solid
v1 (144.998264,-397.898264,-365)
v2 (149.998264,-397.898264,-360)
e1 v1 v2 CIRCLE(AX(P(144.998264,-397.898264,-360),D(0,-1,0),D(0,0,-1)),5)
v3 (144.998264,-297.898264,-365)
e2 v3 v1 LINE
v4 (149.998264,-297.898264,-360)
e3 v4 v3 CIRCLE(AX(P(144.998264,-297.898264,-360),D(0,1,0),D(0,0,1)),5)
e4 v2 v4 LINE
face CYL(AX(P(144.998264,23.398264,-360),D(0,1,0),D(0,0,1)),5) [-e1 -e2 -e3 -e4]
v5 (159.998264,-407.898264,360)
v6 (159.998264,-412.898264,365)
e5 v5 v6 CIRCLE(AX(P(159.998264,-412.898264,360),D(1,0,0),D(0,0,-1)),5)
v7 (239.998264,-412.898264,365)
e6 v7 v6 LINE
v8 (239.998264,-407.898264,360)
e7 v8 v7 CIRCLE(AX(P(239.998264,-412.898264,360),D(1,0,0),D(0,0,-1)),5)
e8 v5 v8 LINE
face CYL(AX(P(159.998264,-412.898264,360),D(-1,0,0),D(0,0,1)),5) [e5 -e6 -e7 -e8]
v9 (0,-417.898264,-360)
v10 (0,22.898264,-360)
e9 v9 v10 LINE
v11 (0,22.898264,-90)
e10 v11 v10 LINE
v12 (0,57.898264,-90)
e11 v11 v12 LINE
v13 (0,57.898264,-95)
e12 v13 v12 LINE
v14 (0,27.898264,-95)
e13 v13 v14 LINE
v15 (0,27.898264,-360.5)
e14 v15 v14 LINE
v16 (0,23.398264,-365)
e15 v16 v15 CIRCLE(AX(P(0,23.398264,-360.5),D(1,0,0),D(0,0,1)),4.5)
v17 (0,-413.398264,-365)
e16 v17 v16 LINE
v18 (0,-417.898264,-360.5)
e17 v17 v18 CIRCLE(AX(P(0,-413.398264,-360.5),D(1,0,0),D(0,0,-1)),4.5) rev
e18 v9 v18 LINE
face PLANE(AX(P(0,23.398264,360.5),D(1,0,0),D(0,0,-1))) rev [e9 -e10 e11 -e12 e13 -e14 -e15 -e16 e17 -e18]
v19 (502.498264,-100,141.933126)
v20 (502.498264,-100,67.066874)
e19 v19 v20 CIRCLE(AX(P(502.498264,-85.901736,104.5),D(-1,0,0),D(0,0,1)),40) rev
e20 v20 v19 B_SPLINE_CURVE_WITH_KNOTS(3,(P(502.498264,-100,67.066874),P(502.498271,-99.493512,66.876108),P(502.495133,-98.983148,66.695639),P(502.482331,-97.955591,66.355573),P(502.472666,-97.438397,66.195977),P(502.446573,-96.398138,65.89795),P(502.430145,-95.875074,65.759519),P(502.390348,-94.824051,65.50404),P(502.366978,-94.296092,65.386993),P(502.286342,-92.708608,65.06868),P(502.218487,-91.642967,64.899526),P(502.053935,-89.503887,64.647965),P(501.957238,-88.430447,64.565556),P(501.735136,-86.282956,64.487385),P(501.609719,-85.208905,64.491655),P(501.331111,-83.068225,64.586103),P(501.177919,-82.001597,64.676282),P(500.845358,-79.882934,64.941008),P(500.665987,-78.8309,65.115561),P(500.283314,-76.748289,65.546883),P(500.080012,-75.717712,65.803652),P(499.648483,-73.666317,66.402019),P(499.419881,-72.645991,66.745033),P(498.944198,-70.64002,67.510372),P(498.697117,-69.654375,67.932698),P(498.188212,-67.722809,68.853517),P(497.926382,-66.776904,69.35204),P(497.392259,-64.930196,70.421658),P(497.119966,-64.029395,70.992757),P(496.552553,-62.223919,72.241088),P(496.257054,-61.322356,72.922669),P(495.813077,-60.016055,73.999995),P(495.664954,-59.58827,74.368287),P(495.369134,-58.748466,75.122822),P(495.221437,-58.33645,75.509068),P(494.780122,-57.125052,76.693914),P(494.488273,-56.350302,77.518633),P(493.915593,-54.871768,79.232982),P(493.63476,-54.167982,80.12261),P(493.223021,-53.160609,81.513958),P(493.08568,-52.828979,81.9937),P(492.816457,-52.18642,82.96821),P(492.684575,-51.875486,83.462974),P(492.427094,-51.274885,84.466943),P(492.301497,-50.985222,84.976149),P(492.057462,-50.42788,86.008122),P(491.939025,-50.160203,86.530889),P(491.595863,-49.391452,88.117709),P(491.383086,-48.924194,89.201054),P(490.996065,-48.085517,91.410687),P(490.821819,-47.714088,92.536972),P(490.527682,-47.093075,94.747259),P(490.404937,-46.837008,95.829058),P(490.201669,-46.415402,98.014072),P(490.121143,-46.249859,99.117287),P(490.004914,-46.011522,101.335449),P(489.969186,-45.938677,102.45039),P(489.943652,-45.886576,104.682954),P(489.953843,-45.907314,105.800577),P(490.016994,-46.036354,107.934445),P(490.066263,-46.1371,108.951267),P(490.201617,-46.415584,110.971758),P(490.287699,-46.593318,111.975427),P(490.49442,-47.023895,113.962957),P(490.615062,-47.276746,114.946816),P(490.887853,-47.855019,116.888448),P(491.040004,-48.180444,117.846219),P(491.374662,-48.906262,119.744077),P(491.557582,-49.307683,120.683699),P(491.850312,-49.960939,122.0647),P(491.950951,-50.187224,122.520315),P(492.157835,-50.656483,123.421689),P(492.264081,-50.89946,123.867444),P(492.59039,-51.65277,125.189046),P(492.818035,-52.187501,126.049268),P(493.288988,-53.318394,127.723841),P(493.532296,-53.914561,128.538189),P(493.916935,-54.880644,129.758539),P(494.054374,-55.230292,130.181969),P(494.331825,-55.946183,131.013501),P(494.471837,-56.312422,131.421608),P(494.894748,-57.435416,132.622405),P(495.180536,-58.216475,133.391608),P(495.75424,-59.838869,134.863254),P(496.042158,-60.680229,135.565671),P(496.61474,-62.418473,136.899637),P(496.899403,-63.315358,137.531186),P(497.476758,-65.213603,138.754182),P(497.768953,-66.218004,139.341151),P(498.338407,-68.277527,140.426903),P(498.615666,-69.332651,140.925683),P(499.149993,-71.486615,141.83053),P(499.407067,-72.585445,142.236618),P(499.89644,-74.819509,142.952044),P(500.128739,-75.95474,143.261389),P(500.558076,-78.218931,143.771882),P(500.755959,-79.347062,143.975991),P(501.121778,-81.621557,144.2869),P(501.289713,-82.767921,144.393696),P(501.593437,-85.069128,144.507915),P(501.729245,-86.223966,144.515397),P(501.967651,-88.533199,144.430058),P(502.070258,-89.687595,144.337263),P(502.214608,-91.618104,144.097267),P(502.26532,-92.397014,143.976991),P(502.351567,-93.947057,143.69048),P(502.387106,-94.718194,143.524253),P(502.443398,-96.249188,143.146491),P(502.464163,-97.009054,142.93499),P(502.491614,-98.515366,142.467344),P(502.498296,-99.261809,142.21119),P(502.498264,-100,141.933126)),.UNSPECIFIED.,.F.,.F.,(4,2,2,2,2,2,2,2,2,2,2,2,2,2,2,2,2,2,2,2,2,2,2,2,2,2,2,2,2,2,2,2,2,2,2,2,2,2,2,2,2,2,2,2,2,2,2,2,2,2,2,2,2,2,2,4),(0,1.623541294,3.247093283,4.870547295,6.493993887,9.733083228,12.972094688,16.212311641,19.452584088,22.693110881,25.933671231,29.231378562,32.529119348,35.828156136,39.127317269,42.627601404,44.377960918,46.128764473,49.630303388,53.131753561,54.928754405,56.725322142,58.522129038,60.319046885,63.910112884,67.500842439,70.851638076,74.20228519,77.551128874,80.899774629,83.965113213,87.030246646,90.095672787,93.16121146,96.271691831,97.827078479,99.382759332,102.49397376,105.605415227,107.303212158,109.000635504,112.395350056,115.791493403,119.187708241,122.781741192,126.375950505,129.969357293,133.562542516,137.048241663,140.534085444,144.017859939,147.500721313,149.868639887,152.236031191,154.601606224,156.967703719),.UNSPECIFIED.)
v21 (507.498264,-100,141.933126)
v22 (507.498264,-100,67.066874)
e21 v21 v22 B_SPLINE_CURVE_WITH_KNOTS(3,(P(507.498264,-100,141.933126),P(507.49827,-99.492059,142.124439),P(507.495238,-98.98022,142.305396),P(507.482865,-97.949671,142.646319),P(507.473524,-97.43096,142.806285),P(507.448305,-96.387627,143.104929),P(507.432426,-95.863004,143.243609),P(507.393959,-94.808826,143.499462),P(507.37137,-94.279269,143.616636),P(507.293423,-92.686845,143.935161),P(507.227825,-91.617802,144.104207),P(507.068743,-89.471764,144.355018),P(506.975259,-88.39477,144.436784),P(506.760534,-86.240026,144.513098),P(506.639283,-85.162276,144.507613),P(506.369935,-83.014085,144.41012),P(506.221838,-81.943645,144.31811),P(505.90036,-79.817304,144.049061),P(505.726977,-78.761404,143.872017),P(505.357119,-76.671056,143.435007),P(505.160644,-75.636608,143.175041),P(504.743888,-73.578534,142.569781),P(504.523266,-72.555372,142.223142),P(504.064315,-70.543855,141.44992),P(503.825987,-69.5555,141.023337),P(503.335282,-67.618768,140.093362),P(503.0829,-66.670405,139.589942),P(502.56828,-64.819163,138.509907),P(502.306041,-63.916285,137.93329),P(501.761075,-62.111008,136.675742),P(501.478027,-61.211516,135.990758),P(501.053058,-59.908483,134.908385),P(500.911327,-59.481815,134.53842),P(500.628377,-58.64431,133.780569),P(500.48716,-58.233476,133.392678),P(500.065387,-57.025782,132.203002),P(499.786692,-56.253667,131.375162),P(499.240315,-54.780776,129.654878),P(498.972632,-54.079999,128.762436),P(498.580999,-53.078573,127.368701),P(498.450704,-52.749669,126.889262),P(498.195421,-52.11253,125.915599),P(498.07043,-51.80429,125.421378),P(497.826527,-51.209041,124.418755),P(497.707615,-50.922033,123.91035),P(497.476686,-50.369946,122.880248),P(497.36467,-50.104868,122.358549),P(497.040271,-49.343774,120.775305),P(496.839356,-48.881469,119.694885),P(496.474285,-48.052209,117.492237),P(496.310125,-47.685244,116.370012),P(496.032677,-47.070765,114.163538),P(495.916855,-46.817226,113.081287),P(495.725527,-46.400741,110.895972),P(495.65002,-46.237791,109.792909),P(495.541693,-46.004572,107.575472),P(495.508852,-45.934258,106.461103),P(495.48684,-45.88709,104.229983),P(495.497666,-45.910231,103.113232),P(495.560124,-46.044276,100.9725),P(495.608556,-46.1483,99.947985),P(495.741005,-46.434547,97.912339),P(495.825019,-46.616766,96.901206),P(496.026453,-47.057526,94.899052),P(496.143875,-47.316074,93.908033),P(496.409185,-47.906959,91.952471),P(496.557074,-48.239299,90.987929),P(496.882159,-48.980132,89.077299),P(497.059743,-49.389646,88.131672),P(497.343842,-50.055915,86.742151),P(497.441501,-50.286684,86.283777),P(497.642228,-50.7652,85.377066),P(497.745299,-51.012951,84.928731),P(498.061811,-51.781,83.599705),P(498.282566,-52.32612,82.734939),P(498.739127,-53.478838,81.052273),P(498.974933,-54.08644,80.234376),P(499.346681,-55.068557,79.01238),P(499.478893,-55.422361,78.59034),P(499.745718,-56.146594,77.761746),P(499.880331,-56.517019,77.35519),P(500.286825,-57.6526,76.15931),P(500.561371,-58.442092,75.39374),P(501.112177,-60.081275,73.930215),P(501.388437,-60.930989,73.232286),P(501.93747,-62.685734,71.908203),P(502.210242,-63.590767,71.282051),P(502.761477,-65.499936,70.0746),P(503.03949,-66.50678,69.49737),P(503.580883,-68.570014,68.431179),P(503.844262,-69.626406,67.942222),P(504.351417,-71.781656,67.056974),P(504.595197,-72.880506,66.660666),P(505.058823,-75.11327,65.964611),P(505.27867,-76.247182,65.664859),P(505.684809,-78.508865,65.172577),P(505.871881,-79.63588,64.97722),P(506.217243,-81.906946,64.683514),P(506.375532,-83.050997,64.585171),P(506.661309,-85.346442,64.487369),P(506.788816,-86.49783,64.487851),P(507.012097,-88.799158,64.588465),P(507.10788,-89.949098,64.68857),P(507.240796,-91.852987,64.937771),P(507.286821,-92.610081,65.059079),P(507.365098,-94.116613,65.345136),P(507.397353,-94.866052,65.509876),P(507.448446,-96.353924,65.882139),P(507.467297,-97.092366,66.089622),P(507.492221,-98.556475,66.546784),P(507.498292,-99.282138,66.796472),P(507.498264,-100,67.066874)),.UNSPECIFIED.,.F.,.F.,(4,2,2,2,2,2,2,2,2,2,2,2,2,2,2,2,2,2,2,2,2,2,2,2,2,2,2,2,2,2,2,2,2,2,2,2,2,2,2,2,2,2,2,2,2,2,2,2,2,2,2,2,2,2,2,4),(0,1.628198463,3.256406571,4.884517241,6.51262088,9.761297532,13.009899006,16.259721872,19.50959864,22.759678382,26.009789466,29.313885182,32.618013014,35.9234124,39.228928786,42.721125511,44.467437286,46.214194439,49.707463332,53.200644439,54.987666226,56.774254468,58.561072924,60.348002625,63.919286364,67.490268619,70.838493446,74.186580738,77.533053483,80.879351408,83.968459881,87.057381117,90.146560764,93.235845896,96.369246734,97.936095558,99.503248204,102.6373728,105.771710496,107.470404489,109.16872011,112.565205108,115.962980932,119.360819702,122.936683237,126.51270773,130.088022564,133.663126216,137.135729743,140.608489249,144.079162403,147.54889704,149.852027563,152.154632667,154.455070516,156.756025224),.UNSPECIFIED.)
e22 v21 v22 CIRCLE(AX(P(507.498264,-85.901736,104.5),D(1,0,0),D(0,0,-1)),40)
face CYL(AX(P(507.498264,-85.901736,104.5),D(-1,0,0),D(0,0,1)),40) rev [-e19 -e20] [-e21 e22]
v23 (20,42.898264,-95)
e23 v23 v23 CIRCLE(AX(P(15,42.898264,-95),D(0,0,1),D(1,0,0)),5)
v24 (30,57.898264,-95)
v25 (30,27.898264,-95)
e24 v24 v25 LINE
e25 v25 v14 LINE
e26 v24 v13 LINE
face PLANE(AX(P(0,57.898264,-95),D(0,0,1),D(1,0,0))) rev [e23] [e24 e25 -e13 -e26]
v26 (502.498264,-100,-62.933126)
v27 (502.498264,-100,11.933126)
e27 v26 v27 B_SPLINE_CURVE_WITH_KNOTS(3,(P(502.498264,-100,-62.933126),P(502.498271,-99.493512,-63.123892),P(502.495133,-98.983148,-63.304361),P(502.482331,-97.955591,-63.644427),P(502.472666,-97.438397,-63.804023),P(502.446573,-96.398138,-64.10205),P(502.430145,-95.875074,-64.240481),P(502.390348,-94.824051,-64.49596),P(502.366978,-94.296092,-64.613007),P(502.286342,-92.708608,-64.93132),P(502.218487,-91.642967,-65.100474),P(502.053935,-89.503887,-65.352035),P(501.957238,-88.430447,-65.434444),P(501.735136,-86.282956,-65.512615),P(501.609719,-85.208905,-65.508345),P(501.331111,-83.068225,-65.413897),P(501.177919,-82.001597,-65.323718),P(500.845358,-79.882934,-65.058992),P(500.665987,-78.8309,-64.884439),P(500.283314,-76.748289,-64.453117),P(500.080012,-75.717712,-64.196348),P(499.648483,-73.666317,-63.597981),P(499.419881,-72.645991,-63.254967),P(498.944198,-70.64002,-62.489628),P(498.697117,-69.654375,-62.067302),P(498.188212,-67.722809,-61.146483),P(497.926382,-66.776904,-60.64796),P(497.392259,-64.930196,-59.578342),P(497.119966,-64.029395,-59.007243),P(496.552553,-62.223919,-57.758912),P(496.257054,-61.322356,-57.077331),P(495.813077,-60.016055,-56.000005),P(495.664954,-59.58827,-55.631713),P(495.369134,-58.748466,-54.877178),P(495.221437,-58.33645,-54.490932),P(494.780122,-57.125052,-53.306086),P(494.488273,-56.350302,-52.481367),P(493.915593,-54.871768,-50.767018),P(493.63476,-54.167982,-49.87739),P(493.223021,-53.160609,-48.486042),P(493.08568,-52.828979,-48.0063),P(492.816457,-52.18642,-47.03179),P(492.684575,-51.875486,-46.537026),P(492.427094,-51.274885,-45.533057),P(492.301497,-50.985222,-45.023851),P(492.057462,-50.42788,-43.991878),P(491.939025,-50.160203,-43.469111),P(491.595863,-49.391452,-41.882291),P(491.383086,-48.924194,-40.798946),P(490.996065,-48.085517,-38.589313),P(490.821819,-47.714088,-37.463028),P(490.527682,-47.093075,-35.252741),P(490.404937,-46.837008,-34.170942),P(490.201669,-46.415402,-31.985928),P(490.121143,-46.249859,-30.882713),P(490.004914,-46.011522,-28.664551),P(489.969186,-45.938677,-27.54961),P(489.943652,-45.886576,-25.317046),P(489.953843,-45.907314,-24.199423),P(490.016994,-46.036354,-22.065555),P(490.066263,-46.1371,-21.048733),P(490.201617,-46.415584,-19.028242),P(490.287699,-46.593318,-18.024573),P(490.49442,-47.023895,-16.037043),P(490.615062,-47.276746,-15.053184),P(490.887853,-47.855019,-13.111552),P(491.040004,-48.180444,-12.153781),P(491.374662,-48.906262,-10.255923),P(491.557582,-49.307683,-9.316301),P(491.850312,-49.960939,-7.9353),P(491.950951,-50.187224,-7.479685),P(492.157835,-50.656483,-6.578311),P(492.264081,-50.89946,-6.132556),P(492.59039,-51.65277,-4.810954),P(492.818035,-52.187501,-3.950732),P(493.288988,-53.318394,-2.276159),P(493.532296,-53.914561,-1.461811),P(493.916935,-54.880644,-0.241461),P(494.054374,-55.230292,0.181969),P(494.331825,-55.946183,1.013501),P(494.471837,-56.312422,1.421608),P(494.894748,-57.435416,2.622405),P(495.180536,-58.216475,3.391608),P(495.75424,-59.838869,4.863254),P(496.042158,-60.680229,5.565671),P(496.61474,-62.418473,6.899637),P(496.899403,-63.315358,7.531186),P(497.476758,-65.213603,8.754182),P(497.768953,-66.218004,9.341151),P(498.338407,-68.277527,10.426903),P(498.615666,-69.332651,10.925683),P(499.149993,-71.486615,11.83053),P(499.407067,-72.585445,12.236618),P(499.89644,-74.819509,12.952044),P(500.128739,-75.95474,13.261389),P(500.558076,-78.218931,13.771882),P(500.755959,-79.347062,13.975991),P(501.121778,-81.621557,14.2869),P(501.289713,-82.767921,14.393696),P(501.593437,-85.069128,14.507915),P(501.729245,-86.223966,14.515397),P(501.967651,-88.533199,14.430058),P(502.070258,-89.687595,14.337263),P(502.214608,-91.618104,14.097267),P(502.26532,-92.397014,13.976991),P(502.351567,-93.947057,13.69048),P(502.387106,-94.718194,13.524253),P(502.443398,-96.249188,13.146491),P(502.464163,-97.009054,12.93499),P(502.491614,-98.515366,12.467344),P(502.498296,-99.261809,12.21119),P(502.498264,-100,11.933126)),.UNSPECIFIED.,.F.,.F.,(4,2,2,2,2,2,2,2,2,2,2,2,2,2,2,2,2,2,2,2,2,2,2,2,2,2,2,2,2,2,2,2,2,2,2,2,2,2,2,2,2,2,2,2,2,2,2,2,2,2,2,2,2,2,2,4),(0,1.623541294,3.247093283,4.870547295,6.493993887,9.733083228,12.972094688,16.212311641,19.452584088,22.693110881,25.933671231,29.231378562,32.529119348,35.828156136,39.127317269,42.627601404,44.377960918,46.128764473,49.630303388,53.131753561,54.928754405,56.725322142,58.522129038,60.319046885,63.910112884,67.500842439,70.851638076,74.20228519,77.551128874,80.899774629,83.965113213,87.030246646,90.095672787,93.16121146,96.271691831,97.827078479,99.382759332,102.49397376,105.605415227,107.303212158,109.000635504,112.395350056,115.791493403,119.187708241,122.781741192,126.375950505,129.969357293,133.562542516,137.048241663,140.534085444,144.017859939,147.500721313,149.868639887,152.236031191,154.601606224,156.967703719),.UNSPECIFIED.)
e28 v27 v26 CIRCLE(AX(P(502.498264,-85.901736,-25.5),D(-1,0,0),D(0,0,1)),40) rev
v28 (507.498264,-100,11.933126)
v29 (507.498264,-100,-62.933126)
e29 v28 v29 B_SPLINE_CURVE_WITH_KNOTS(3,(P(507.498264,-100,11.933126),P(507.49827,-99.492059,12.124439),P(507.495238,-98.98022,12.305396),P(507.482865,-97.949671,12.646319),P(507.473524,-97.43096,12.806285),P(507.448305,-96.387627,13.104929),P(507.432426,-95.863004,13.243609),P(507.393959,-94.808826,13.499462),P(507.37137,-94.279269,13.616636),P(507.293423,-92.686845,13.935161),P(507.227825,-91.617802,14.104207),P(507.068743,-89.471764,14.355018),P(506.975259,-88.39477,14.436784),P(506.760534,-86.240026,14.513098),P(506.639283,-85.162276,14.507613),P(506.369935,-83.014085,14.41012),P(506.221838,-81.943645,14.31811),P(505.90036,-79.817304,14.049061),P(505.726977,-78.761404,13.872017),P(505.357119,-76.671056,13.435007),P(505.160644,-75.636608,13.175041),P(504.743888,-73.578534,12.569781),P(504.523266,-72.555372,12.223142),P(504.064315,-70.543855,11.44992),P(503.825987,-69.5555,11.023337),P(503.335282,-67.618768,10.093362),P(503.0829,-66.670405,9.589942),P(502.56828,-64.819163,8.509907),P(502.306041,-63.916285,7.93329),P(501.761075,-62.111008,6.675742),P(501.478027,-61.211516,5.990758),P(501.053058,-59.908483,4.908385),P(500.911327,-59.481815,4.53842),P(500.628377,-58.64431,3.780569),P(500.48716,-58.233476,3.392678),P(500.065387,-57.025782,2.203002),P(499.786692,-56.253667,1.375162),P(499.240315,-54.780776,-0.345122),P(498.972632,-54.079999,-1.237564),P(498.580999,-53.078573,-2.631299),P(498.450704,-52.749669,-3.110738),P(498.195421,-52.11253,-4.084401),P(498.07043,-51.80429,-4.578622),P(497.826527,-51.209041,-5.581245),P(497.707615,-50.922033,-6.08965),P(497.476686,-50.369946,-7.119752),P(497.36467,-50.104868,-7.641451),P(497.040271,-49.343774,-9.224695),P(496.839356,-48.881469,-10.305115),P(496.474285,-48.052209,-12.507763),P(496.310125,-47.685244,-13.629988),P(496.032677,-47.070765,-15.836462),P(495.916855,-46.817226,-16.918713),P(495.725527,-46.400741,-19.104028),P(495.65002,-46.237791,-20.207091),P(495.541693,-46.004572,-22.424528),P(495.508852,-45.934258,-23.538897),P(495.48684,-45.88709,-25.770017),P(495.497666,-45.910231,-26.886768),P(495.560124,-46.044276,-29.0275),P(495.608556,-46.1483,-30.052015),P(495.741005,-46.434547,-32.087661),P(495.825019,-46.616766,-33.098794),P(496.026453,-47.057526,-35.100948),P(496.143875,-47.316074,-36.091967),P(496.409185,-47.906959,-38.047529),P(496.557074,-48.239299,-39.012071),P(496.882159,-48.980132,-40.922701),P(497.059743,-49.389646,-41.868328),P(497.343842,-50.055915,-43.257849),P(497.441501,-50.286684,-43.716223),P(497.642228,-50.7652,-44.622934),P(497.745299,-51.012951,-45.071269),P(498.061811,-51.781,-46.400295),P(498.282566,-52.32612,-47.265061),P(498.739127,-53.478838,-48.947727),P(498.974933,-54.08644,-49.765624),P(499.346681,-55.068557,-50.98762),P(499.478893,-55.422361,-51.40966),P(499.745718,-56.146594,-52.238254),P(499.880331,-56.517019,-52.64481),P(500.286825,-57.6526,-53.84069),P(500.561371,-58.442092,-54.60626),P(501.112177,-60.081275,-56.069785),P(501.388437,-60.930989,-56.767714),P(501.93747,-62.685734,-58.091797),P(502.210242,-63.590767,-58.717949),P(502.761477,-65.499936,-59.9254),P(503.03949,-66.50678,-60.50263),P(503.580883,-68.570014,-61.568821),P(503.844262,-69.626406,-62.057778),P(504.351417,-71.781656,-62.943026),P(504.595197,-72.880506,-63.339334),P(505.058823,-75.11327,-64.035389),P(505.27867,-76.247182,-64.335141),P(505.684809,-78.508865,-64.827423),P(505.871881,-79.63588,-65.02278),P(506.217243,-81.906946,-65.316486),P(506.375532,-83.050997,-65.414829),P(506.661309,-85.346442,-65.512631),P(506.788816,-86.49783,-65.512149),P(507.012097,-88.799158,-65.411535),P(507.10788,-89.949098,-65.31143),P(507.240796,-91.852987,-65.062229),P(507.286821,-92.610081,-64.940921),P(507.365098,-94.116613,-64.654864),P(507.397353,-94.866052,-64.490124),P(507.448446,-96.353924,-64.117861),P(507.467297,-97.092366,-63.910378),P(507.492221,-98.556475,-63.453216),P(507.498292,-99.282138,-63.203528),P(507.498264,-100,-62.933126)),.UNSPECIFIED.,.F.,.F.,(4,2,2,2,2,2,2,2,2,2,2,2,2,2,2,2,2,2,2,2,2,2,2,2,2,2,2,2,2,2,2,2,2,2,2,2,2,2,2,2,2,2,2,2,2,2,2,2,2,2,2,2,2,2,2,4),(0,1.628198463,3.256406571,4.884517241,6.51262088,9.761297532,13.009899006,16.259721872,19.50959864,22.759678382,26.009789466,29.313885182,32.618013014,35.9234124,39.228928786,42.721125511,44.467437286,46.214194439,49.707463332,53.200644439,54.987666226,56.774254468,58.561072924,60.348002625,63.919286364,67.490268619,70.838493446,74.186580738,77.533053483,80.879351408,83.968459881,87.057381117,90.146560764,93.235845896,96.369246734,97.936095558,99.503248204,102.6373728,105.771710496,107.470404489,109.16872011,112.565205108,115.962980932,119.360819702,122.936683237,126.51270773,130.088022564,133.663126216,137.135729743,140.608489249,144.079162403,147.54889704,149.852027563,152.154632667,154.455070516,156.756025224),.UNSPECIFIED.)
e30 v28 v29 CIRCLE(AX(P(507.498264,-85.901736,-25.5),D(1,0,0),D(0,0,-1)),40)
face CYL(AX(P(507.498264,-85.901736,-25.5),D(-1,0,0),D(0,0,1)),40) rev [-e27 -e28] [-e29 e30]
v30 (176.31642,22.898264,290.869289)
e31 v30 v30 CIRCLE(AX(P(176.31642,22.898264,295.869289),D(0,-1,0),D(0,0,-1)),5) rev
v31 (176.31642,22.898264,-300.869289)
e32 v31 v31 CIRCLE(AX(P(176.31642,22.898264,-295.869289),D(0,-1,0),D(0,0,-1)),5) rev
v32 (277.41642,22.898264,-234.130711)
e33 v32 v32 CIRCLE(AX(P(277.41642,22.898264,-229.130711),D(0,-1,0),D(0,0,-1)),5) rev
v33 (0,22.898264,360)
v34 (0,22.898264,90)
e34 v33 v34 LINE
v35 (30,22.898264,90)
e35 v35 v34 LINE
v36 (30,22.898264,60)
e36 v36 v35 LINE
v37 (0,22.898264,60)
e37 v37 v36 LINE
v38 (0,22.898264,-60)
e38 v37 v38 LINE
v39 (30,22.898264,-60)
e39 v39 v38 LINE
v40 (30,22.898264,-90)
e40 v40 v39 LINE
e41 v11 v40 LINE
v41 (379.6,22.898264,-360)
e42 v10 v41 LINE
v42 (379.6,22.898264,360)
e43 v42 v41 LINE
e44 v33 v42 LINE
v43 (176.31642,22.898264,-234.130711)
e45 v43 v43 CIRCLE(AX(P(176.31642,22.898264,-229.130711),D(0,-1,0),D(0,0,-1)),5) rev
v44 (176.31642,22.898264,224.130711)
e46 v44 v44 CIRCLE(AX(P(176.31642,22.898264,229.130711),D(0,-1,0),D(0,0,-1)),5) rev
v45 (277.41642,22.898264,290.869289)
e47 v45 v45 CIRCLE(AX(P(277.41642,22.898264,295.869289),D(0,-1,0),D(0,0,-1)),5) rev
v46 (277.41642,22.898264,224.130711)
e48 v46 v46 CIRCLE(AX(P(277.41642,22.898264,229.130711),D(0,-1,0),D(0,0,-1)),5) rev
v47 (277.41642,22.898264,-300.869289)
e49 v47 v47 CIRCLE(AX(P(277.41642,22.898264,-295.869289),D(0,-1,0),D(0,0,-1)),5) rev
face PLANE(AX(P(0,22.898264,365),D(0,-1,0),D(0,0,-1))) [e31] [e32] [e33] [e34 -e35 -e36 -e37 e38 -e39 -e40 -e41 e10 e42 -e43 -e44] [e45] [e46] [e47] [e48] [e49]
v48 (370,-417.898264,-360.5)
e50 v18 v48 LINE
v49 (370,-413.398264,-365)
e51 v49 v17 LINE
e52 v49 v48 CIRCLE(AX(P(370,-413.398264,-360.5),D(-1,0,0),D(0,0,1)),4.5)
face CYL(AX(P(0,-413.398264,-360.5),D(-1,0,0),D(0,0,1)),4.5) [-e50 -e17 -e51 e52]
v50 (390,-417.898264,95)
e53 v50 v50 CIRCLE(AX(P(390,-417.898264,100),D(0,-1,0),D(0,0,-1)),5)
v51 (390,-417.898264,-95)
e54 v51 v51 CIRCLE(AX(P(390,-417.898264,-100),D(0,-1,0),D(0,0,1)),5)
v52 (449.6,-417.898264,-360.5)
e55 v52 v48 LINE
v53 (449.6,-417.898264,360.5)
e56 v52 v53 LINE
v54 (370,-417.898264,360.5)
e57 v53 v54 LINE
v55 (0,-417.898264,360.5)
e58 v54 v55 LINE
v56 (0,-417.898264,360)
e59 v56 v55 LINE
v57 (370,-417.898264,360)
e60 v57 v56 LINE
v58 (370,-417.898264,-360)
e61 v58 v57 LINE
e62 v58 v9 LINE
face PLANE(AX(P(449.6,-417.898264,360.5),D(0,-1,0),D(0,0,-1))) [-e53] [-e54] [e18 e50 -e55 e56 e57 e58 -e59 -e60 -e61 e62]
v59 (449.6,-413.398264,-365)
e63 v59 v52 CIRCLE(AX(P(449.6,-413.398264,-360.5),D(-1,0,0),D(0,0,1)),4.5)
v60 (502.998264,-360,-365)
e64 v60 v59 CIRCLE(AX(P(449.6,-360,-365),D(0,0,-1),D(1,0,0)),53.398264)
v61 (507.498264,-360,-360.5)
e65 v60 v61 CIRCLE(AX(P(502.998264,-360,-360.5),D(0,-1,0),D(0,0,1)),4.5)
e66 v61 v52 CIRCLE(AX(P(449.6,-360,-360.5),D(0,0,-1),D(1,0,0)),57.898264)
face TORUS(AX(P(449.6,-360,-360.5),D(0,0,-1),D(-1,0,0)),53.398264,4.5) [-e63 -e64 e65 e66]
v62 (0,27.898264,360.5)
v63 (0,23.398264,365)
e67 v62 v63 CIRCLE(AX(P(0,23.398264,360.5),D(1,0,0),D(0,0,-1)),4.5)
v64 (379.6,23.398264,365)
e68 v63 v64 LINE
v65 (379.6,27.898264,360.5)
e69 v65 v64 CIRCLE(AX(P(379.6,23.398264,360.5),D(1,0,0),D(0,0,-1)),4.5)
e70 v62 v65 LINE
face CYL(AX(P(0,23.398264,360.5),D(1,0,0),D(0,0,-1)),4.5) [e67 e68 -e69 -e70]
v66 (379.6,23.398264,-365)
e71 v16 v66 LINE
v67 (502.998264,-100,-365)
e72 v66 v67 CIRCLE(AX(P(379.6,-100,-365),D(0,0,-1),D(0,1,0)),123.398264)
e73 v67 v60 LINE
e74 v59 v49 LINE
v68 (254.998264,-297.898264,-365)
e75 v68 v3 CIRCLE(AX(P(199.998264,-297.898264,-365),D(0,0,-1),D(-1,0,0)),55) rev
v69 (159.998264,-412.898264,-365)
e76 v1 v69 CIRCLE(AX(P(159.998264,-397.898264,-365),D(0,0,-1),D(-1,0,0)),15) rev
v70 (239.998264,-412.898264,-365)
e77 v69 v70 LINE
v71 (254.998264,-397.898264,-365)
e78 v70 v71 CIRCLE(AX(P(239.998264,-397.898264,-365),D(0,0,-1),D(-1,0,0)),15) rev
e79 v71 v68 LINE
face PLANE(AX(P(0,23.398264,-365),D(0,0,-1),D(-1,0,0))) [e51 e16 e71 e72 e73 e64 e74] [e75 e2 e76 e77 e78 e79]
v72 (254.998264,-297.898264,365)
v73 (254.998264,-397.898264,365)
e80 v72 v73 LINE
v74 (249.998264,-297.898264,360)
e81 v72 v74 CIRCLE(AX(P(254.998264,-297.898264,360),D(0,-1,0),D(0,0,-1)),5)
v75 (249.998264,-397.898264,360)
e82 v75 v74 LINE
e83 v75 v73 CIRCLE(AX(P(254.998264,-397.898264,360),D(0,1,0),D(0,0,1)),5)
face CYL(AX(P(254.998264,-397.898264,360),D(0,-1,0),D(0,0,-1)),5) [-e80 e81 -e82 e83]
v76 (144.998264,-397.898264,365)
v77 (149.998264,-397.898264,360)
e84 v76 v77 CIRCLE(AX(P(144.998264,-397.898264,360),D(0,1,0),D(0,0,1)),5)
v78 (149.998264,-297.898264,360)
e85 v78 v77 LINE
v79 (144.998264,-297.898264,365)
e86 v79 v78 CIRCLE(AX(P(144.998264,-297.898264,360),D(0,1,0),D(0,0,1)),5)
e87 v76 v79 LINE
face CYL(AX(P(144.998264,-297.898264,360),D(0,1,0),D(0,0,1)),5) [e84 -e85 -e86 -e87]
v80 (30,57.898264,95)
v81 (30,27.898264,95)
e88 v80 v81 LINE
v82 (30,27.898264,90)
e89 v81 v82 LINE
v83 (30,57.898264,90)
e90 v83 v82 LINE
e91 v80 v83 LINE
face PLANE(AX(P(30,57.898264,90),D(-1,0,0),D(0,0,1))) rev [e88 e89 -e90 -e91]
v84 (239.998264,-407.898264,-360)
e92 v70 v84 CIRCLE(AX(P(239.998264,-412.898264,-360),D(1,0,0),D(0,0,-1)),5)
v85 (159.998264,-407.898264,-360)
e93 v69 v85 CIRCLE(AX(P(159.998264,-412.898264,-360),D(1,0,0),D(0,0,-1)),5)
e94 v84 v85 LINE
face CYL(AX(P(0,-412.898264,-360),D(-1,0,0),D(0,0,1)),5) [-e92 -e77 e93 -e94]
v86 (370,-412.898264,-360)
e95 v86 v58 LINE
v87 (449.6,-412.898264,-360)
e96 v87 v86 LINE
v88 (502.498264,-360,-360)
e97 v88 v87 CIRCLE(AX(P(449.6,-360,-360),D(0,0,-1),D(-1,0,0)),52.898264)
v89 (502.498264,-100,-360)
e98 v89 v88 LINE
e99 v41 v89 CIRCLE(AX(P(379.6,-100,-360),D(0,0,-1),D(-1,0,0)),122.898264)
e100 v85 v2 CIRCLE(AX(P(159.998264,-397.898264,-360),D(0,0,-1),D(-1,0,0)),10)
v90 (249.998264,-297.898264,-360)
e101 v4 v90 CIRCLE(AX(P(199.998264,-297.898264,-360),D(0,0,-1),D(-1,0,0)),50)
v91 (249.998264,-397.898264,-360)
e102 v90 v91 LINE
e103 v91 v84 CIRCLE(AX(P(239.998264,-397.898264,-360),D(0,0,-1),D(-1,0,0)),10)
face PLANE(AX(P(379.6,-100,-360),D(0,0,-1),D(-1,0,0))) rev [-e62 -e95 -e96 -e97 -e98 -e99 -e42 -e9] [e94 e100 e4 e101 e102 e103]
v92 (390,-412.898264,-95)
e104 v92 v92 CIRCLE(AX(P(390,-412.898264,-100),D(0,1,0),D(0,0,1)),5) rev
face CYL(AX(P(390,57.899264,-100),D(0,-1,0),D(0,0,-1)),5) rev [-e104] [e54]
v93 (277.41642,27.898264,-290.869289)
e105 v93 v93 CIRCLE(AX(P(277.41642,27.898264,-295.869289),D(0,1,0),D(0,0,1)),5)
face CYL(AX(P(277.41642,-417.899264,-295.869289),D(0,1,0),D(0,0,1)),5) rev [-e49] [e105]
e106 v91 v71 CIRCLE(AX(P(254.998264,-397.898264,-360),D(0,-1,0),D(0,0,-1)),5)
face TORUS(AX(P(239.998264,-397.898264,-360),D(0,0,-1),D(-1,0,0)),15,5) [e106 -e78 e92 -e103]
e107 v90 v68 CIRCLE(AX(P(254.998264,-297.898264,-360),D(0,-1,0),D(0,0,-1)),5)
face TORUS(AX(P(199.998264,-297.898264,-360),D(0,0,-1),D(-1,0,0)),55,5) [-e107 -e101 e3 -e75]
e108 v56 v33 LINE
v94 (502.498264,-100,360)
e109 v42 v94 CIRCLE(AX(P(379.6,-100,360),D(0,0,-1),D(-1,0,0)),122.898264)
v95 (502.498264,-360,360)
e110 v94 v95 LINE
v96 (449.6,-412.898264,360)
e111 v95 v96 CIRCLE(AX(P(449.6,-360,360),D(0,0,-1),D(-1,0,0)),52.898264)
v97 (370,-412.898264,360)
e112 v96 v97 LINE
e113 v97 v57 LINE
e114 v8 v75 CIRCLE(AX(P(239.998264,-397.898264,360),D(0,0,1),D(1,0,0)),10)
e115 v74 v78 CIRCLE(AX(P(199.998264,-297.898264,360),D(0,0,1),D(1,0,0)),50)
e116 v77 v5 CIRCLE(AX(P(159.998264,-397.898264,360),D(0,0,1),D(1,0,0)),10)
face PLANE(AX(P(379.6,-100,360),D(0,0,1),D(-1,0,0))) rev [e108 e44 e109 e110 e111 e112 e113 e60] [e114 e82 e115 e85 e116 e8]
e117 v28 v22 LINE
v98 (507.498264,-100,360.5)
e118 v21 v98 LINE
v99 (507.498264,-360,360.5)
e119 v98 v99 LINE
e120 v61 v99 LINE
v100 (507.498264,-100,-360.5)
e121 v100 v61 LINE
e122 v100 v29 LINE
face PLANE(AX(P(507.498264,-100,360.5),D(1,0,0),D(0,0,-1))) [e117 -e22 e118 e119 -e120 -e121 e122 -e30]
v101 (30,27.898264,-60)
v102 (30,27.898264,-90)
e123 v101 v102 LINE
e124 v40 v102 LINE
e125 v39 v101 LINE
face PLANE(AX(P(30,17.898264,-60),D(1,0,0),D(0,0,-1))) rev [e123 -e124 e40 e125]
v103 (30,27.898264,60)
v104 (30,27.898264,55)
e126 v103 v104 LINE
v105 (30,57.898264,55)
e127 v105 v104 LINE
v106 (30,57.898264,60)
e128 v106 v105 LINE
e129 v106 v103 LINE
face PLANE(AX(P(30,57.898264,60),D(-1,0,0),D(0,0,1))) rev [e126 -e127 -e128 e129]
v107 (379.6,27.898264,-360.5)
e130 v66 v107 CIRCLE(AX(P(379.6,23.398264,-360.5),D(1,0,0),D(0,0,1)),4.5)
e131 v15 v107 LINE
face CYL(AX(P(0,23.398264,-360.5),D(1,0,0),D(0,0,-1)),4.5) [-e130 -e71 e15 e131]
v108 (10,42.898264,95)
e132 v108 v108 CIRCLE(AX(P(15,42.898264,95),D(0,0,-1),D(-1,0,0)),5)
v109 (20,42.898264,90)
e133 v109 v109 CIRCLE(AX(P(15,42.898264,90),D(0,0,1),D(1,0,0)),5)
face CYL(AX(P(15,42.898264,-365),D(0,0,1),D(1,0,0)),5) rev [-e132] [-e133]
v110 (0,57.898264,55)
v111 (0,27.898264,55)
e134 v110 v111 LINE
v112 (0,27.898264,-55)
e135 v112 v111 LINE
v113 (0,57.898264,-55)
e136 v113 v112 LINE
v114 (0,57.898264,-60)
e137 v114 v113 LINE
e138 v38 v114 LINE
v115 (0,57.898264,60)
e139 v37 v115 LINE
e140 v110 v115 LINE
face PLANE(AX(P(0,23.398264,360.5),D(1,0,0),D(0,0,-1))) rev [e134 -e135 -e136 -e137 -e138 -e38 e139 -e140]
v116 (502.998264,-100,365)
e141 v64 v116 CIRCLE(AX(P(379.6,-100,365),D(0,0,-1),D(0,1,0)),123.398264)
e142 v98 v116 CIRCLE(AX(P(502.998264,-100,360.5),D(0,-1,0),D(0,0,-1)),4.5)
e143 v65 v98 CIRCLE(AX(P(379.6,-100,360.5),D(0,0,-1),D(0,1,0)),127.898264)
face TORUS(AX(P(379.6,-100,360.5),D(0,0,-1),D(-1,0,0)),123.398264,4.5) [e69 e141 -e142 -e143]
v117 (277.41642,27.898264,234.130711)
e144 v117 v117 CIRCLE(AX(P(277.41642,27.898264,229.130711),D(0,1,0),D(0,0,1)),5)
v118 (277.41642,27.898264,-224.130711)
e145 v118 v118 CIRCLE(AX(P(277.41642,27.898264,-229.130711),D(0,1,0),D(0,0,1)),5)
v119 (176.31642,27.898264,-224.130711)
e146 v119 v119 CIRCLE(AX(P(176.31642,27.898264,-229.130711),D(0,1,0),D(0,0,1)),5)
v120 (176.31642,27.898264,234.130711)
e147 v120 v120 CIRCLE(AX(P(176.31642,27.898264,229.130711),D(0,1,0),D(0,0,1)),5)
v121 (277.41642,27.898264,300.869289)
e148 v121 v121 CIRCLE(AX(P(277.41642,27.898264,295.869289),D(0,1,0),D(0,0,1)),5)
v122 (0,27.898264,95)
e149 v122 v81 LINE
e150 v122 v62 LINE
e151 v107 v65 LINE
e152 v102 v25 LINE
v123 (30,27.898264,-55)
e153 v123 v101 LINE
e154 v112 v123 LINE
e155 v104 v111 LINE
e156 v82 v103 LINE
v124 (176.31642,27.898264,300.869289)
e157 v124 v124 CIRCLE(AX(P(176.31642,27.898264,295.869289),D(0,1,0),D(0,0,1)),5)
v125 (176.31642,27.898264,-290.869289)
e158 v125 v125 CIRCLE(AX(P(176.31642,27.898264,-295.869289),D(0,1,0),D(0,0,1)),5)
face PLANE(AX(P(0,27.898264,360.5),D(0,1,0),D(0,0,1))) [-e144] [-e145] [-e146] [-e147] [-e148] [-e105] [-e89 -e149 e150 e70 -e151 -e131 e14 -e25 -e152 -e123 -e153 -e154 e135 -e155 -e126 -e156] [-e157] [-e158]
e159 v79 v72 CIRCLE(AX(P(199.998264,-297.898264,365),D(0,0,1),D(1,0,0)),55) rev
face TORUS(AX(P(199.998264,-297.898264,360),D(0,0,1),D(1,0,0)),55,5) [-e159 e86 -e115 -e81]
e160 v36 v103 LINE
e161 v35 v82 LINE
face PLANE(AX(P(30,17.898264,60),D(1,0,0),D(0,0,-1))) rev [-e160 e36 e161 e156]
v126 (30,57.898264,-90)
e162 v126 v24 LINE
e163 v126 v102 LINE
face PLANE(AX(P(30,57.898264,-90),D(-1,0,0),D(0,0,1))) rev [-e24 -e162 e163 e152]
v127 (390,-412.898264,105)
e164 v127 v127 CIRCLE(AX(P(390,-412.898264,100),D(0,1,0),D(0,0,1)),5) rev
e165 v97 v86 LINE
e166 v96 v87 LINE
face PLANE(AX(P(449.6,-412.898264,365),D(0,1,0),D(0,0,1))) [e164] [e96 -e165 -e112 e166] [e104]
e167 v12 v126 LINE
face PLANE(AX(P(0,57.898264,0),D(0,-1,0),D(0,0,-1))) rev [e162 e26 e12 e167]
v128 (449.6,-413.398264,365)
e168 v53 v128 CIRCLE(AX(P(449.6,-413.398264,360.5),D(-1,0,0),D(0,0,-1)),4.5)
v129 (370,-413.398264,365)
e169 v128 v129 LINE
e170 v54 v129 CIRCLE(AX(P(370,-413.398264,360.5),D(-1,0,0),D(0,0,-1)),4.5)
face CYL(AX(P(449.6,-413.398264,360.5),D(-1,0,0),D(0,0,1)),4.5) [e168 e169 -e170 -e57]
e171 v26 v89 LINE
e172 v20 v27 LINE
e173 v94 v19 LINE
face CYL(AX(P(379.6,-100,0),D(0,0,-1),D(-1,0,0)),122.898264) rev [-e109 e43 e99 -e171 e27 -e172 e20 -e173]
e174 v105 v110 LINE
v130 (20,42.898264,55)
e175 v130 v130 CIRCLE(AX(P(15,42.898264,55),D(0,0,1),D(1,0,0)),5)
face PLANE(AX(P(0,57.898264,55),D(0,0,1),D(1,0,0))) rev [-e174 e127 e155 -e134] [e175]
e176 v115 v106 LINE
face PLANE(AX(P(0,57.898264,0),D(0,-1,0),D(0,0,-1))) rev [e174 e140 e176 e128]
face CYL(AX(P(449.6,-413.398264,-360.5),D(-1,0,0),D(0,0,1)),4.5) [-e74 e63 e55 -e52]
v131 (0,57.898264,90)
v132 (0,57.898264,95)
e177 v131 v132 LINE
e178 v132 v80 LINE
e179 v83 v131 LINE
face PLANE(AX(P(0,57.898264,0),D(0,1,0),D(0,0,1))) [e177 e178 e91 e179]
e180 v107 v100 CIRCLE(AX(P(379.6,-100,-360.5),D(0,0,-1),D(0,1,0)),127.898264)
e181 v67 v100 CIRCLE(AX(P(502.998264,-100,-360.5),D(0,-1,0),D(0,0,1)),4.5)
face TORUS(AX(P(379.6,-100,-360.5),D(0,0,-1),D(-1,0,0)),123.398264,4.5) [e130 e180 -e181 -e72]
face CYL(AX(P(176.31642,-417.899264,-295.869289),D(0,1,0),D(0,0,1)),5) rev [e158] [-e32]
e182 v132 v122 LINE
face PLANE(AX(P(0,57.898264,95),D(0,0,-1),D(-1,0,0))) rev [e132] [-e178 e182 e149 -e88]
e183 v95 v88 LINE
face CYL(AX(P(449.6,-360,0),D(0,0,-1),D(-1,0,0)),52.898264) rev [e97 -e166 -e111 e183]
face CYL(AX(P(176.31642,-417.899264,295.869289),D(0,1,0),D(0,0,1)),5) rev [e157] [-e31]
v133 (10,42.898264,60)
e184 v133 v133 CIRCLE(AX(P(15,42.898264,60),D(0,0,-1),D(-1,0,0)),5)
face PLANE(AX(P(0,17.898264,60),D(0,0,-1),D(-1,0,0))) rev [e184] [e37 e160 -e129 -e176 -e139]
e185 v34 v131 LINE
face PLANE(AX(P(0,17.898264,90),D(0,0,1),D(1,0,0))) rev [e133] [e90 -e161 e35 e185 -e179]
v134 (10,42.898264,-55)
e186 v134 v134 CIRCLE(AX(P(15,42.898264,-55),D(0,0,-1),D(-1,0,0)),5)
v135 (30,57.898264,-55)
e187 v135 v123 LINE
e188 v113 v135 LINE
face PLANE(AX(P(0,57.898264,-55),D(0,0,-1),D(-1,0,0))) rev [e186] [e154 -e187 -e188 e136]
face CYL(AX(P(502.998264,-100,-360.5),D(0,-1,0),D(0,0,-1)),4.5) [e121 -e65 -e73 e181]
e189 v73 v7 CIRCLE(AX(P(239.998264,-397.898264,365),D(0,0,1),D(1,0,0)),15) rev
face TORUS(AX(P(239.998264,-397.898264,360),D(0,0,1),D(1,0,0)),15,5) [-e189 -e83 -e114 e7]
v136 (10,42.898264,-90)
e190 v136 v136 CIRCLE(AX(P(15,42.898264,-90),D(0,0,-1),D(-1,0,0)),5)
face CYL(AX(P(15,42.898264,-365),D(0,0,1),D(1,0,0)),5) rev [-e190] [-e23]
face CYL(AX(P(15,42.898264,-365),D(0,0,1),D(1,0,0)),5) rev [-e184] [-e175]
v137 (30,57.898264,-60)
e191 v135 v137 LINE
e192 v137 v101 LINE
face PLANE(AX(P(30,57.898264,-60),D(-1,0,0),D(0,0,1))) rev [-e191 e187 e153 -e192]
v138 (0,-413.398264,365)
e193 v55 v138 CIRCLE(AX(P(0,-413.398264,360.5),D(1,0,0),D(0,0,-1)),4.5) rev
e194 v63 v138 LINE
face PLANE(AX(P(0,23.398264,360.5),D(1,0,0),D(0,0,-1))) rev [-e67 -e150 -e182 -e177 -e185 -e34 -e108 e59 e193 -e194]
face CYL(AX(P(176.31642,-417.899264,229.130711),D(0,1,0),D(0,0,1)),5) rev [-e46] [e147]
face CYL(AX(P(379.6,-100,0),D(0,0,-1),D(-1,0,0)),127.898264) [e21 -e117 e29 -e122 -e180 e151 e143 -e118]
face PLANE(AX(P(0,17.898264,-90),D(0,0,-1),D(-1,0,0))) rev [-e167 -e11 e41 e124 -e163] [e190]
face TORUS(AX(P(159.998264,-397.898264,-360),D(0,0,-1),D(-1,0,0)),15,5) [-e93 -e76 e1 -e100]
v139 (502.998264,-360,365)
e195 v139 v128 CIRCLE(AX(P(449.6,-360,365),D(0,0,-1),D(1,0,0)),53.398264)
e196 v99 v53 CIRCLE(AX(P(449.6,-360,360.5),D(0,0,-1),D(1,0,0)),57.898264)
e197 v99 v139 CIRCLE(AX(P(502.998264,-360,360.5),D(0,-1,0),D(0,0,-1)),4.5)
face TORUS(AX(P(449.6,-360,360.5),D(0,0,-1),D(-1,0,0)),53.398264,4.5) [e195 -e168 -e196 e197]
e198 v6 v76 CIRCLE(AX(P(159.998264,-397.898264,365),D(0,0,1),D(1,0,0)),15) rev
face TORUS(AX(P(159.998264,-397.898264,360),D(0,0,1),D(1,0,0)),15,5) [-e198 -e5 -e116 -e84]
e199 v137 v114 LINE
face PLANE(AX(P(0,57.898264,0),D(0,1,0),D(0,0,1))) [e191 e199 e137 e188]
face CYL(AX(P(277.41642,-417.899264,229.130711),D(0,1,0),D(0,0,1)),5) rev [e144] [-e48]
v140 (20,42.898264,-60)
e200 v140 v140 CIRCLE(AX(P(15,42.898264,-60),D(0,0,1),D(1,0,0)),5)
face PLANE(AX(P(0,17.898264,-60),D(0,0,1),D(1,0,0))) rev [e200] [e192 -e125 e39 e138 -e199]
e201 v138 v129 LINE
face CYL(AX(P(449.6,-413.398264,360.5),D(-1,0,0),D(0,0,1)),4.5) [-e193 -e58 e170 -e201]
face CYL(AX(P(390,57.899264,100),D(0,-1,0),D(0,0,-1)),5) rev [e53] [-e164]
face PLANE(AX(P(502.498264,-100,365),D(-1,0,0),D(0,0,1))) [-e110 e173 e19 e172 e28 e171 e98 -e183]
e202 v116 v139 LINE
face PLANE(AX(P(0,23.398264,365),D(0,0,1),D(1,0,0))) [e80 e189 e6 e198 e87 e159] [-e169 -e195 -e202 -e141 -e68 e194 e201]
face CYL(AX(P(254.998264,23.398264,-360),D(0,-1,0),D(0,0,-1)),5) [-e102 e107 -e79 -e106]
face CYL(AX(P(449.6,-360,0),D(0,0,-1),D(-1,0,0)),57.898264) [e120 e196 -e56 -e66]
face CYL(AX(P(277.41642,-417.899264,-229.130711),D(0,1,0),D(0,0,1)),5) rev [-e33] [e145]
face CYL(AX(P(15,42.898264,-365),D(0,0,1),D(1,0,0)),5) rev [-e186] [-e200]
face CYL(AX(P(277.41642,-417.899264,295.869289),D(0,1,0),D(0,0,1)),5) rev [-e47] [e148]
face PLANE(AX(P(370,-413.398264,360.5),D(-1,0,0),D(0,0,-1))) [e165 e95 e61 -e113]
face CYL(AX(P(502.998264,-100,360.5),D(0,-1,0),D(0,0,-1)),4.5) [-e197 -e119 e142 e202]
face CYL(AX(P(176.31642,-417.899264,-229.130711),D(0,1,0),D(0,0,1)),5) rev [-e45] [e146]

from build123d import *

# Parameters (mm, degrees)
CUT_EXTRUDE1_DEPTH      = 10
BOSS_EXTRUDE1_DEPTH     = 30
CUT_EXTRUDE2_DEPTH      = 752.943114111524
CUT_EXTRUDE2_DEPTH_BACK = 752.943114111524
SKETCH5_R               = 4.999999999999998
SKETCH6_R               = 40.00000000000003
CUT_EXTRUDE3_DEPTH      = 752.943114111524
BOSS_EXTRUDE3_DEPTH     = 5
CUT_EXTRUDE4_DEPTH      = 752.943114111524
CUT_EXTRUDE4_DEPTH_BACK = 752.943114111524
FILLET1_R               = 5
FILLET2_R               = 4.5
CUT_EXTRUDE5_REACH      = 769.798
SKETCH13_R              = 4.999999999999991
CUT_EXTRUDE6_REACH      = 787.596
SKETCH14_R              = 4.999999999999991
SKETCH14_R_2            = 4.999999999999939


with BuildPart() as part:
    # Sweep2: sweep along a path in Sketch1
    with BuildLine(Plane.XY) as sweep2_path:
        Line((0, 0), (379.6, 0))
        ThreePointArc((379.6, 0), (450.3106781186548, -29.289321881345245), (479.6, -99.99999999999997))
        Line((479.6, -99.99999999999997), (479.6, -360))
        ThreePointArc((479.6, -360), (470.81320343559645, -381.21320343559637), (449.6000000000001, -390))
        Line((449.6000000000001, -390), (370.00000000000006, -390))
    # Sketch2 → Sweep2 (sweep)
    with BuildSketch(Plane(origin=(0, 0, 0), x_dir=(0, 0, -1), z_dir=(1, 0, 0))):
        with BuildLine():
            Line((-360.49999999999994, 27.89826377546352), (360.50000000000006, 27.89826377546352))
            ThreePointArc((360.50000000000006, 27.89826377546352), (363.68198051533955, 26.580244290802984), (365.00000000000006, 23.39826377546352))
            Line((365.00000000000006, 23.39826377546352), (365.00000000000006, 22.89826377546352))
            Line((365.00000000000006, 22.89826377546352), (-364.99999999999994, 22.89826377546352))
            Line((-364.99999999999994, 22.89826377546352), (-364.99999999999994, 23.39826377546352))
            ThreePointArc((-364.99999999999994, 23.39826377546352), (-363.68198051533943, 26.580244290802984), (-360.49999999999994, 27.89826377546352))
        make_face()
    sweep(path=sweep2_path.line)

    # Sketch3 → Cut-Extrude1 (cut)
    with BuildSketch(Plane(origin=(0, 27.89826377546352, 0), x_dir=(1, 0, 0), z_dir=(0, 1, 0))):
        Polygon((-8.83e-15, 60), (30.00000000000002, 60), (30.00000000000002, 90.00000000000003), (-6.99e-15, 90.00000000000003), align=None)
        Polygon((-8.83e-15, -60), (30.00000000000002, -60), (30.00000000000002, -90.00000000000003), (-6.99e-15, -90.00000000000003), align=None)
    extrude(amount=-CUT_EXTRUDE1_DEPTH, mode=Mode.SUBTRACT)

    # Sketch4 → Boss-Extrude1 (add)
    with BuildSketch(Plane(origin=(0, 27.89826377546352, 0), x_dir=(1, 0, 0), z_dir=(0, 1, 0))):
        Polygon((0, -90.00000000000003), (30.00000000000002, -90.00000000000003), (30.00000000000002, -95.00000000000003), (6.1e-16, -95.00000000000003), align=None)
        Polygon((-8.83e-15, -60), (30.00000000000002, -60), (30.00000000000002, -54.99999999999999), (0, -54.99999999999999), align=None)
        Polygon((6.1e-16, 95.00000000000003), (30.00000000000002, 95.00000000000003), (30.00000000000002, 90.00000000000003), (0, 90.00000000000003), align=None)
        Polygon((0, 54.99999999999999), (30.00000000000002, 54.99999999999999), (30.00000000000002, 60), (-8.83e-15, 60), align=None)
    extrude(amount=BOSS_EXTRUDE1_DEPTH)

    # Sketch5 → Cut-Extrude2 (cut, two sides: drawn at the far end of the back side and taken through both)
    with BuildSketch(Plane.XY.offset(-CUT_EXTRUDE2_DEPTH_BACK)):
        with Locations((15.000000000000012, 42.89826377546352)):
            Circle(SKETCH5_R)
    extrude(amount=CUT_EXTRUDE2_DEPTH + CUT_EXTRUDE2_DEPTH_BACK, mode=Mode.SUBTRACT)

    # Sketch6 → Cut-Extrude3 (cut, through all)
    with BuildSketch(Plane(origin=(0, 0, 0), x_dir=(0, 0, -1), z_dir=(1, 0, 0))):
        with Locations(Location((-104.49999999999999, -85.90173622453648, 0), (0, 0, 200.637645216))):
            Circle(SKETCH6_R)
        with Locations(Location((25.50000000000002, -85.90173622453648, 0), (0, 0, 200.637645216))):
            Circle(SKETCH6_R)
    extrude(amount=CUT_EXTRUDE3_DEPTH, mode=Mode.SUBTRACT)

    # Sketch9 → Boss-Extrude3 (add)
    with BuildSketch(Plane(origin=(0, 0, -365.00000000000006), x_dir=(-1, 0, 0), z_dir=(0, 0, -1))):
        with BuildLine():
            Line((0, 22.898263775463516), (-379.6, 22.898263775463516))
            ThreePointArc((-379.6, 22.898263775463516), (-466.50219571168327, -13.097804288316723), (-502.49826377546356, -99.99999999999997))
            Line((-502.49826377546356, -99.99999999999997), (-502.49826377546356, -360))
            ThreePointArc((-502.49826377546356, -360), (-487.0047210286247, -397.4047210286247), (-449.6000000000001, -412.89826377546353))
            Line((-449.6000000000001, -412.89826377546353), (-370.00000000000006, -412.89826377546353))
            Line((-370.00000000000006, -412.89826377546353), (-370.00000000000006, -417.89826377546353))
            Line((-370.00000000000006, -417.89826377546353), (0, -417.89826377546353))
            Line((0, -417.89826377546353), (0, -412.89826377546353))
            Line((0, -412.89826377546353), (0, 22.898263775463516))
        make_face()
    boss_extrude3 = extrude(amount=-BOSS_EXTRUDE3_DEPTH)

    # Mirror3: Boss-Extrude3 across plane
    add(boss_extrude3.mirror(Plane.XY))

    # Sketch11 → Cut-Extrude4 (cut, two sides: drawn at the far end of the back side and taken through both)
    with BuildSketch(Plane.XY.offset(-CUT_EXTRUDE4_DEPTH_BACK)):
        with BuildLine():
            Line((149.99826377546347, -297.89826377546353), (149.99826377546347, -397.89826377546353))
            ThreePointArc((149.99826377546347, -397.89826377546353), (152.927195963598, -404.969331587329), (159.99826377546347, -407.8982637754636))
            Line((159.99826377546347, -407.8982637754636), (239.99826377546347, -407.8982637754636))
            ThreePointArc((239.99826377546347, -407.8982637754636), (247.06933158732897, -404.96933158732907), (249.99826377546347, -397.89826377546353))
            Line((249.99826377546347, -397.89826377546353), (249.99826377546347, -297.89826377546353))
            ThreePointArc((249.99826377546347, -297.89826377546353), (199.99826377546347, -247.89826377546353), (149.99826377546347, -297.89826377546353))
        make_face()
    extrude(amount=CUT_EXTRUDE4_DEPTH + CUT_EXTRUDE4_DEPTH_BACK, mode=Mode.SUBTRACT)

    # Fillet1
    fillet1_edges = [part.edges().sort_by_distance(p)[0] for p in [
        (247.06933158732897, -404.96933158732907, -365.00000000000006),
        (247.06933158732897, -404.96933158732907, 364.99999999999994),
        (199.99826377546344, -407.8982637754636, -365.00000000000006),
        (199.99826377546344, -407.8982637754636, 364.99999999999994),
        (152.927195963598, -404.969331587329, -365.00000000000006),
        (152.927195963598, -404.969331587329, 364.99999999999994),
        (149.99826377546347, -347.89826377546353, -365.00000000000006),
        (149.99826377546347, -347.89826377546353, 364.99999999999994),
        (199.99826377546347, -247.89826377546353, -365.00000000000006),
        (199.99826377546347, -247.89826377546353, 364.99999999999994),
        (249.99826377546347, -347.89826377546353, -365.00000000000006),
        (249.99826377546347, -347.89826377546353, 364.99999999999994),
    ]]
    fillet(fillet1_edges, radius=FILLET1_R - 0.0001)  # a hair under: the kernel refuses the full size

    # Fillet2
    fillet2_edges = [part.edges().sort_by_distance(p)[0] for p in [
        (185.00000000000003, -417.89826377546353, -365.00000000000006),
        (185.00000000000003, -417.89826377546353, 365.00000000000006),
    ]]
    fillet(fillet2_edges, radius=FILLET2_R)

    # Sketch13 → Cut-Extrude5 (cut, up to next)
    with BuildSketch(Plane(origin=(0, 27.89826377546352, 0), x_dir=(1, 0, 0), z_dir=(0, 1, 0)), mode=Mode.PRIVATE) as cut_extrude5_sk1:
        with Locations(Location((176.31641992134345, -229.13071131685336, 0), (0, 0, 270))):
            Circle(SKETCH13_R)
    cut_extrude5_tool1 = extrude(cut_extrude5_sk1.sketch, amount=-CUT_EXTRUDE5_REACH, mode=Mode.PRIVATE) & part.part
    # Sketch13 → Cut-Extrude5 (cut, up to next)
    with BuildSketch(Plane(origin=(0, 27.89826377546352, 0), x_dir=(1, 0, 0), z_dir=(0, 1, 0)), mode=Mode.PRIVATE) as cut_extrude5_sk2:
        with Locations(Location((277.4164199213434, -295.869288683147, 0), (0, 0, 270))):
            Circle(SKETCH13_R)
    cut_extrude5_tool2 = extrude(cut_extrude5_sk2.sketch, amount=-CUT_EXTRUDE5_REACH, mode=Mode.PRIVATE) & part.part
    # Sketch13 → Cut-Extrude5 (cut, up to next)
    with BuildSketch(Plane(origin=(0, 27.89826377546352, 0), x_dir=(1, 0, 0), z_dir=(0, 1, 0)), mode=Mode.PRIVATE) as cut_extrude5_sk3:
        with Locations(Location((277.4164199213434, -229.13071131685336, 0), (0, 0, 270))):
            Circle(SKETCH13_R)
    cut_extrude5_tool3 = extrude(cut_extrude5_sk3.sketch, amount=-CUT_EXTRUDE5_REACH, mode=Mode.PRIVATE) & part.part
    # Sketch13 → Cut-Extrude5 (cut, up to next)
    with BuildSketch(Plane(origin=(0, 27.89826377546352, 0), x_dir=(1, 0, 0), z_dir=(0, 1, 0)), mode=Mode.PRIVATE) as cut_extrude5_sk4:
        with Locations(Location((176.31641992134345, -295.869288683147, 0), (0, 0, 270))):
            Circle(SKETCH13_R)
    cut_extrude5_tool4 = extrude(cut_extrude5_sk4.sketch, amount=-CUT_EXTRUDE5_REACH, mode=Mode.PRIVATE) & part.part
    # Sketch13 → Cut-Extrude5 (cut, up to next)
    with BuildSketch(Plane(origin=(0, 27.89826377546352, 0), x_dir=(1, 0, 0), z_dir=(0, 1, 0)), mode=Mode.PRIVATE) as cut_extrude5_sk5:
        with Locations(Location((277.4164199213434, 229.13071131685336, 0), (0, 0, 270))):
            Circle(SKETCH13_R)
    cut_extrude5_tool5 = extrude(cut_extrude5_sk5.sketch, amount=-CUT_EXTRUDE5_REACH, mode=Mode.PRIVATE) & part.part
    # Sketch13 → Cut-Extrude5 (cut, up to next)
    with BuildSketch(Plane(origin=(0, 27.89826377546352, 0), x_dir=(1, 0, 0), z_dir=(0, 1, 0)), mode=Mode.PRIVATE) as cut_extrude5_sk6:
        with Locations(Location((176.31641992134345, 229.13071131685336, 0), (0, 0, 270))):
            Circle(SKETCH13_R)
    cut_extrude5_tool6 = extrude(cut_extrude5_sk6.sketch, amount=-CUT_EXTRUDE5_REACH, mode=Mode.PRIVATE) & part.part
    # Sketch13 → Cut-Extrude5 (cut, up to next)
    with BuildSketch(Plane(origin=(0, 27.89826377546352, 0), x_dir=(1, 0, 0), z_dir=(0, 1, 0)), mode=Mode.PRIVATE) as cut_extrude5_sk7:
        with Locations(Location((176.31641992134345, 295.869288683147, 0), (0, 0, 270))):
            Circle(SKETCH13_R)
    cut_extrude5_tool7 = extrude(cut_extrude5_sk7.sketch, amount=-CUT_EXTRUDE5_REACH, mode=Mode.PRIVATE) & part.part
    # Sketch13 → Cut-Extrude5 (cut, up to next)
    with BuildSketch(Plane(origin=(0, 27.89826377546352, 0), x_dir=(1, 0, 0), z_dir=(0, 1, 0)), mode=Mode.PRIVATE) as cut_extrude5_sk8:
        with Locations(Location((277.4164199213434, 295.869288683147, 0), (0, 0, 270))):
            Circle(SKETCH13_R)
    cut_extrude5_tool8 = extrude(cut_extrude5_sk8.sketch, amount=-CUT_EXTRUDE5_REACH, mode=Mode.PRIVATE) & part.part
    add(cut_extrude5_tool1.solids().sort_by_distance((176.31642, 27.898264, 229.130711))[0], mode=Mode.SUBTRACT)
    add(cut_extrude5_tool2.solids().sort_by_distance((277.41642, 27.898264, 295.869289))[0], mode=Mode.SUBTRACT)
    add(cut_extrude5_tool3.solids().sort_by_distance((277.41642, 27.898264, 229.130711))[0], mode=Mode.SUBTRACT)
    add(cut_extrude5_tool4.solids().sort_by_distance((176.31642, 27.898264, 295.869289))[0], mode=Mode.SUBTRACT)
    add(cut_extrude5_tool5.solids().sort_by_distance((277.41642, 27.898264, -229.130711))[0], mode=Mode.SUBTRACT)
    add(cut_extrude5_tool6.solids().sort_by_distance((176.31642, 27.898264, -229.130711))[0], mode=Mode.SUBTRACT)
    add(cut_extrude5_tool7.solids().sort_by_distance((176.31642, 27.898264, -295.869289))[0], mode=Mode.SUBTRACT)
    add(cut_extrude5_tool8.solids().sort_by_distance((277.41642, 27.898264, -295.869289))[0], mode=Mode.SUBTRACT)

    # Sketch14 → Cut-Extrude6 (cut, up to next)
    with BuildSketch(Plane.XZ.offset(417.89826377546353), mode=Mode.PRIVATE) as cut_extrude6_sk1:
        with Locations(Location((390.00000000000006, 99.99999999999999, 0), (0, 0, 270))):
            Circle(SKETCH14_R)
    cut_extrude6_tool1 = extrude(cut_extrude6_sk1.sketch, amount=-CUT_EXTRUDE6_REACH, mode=Mode.PRIVATE) & part.part
    # Sketch14 → Cut-Extrude6 (cut, up to next)
    with BuildSketch(Plane.XZ.offset(417.89826377546353), mode=Mode.PRIVATE) as cut_extrude6_sk2:
        with Locations(Location((390.0000000000002, -100.00000000000018, 0), (0, 0, 90))):
            Circle(SKETCH14_R_2)
    cut_extrude6_tool2 = extrude(cut_extrude6_sk2.sketch, amount=-CUT_EXTRUDE6_REACH, mode=Mode.PRIVATE) & part.part
    add(cut_extrude6_tool1.solids().sort_by_distance((390, -417.898264, 100))[0], mode=Mode.SUBTRACT)
    add(cut_extrude6_tool2.solids().sort_by_distance((390, -417.898264, -100))[0], mode=Mode.SUBTRACT)


solid = part.part
